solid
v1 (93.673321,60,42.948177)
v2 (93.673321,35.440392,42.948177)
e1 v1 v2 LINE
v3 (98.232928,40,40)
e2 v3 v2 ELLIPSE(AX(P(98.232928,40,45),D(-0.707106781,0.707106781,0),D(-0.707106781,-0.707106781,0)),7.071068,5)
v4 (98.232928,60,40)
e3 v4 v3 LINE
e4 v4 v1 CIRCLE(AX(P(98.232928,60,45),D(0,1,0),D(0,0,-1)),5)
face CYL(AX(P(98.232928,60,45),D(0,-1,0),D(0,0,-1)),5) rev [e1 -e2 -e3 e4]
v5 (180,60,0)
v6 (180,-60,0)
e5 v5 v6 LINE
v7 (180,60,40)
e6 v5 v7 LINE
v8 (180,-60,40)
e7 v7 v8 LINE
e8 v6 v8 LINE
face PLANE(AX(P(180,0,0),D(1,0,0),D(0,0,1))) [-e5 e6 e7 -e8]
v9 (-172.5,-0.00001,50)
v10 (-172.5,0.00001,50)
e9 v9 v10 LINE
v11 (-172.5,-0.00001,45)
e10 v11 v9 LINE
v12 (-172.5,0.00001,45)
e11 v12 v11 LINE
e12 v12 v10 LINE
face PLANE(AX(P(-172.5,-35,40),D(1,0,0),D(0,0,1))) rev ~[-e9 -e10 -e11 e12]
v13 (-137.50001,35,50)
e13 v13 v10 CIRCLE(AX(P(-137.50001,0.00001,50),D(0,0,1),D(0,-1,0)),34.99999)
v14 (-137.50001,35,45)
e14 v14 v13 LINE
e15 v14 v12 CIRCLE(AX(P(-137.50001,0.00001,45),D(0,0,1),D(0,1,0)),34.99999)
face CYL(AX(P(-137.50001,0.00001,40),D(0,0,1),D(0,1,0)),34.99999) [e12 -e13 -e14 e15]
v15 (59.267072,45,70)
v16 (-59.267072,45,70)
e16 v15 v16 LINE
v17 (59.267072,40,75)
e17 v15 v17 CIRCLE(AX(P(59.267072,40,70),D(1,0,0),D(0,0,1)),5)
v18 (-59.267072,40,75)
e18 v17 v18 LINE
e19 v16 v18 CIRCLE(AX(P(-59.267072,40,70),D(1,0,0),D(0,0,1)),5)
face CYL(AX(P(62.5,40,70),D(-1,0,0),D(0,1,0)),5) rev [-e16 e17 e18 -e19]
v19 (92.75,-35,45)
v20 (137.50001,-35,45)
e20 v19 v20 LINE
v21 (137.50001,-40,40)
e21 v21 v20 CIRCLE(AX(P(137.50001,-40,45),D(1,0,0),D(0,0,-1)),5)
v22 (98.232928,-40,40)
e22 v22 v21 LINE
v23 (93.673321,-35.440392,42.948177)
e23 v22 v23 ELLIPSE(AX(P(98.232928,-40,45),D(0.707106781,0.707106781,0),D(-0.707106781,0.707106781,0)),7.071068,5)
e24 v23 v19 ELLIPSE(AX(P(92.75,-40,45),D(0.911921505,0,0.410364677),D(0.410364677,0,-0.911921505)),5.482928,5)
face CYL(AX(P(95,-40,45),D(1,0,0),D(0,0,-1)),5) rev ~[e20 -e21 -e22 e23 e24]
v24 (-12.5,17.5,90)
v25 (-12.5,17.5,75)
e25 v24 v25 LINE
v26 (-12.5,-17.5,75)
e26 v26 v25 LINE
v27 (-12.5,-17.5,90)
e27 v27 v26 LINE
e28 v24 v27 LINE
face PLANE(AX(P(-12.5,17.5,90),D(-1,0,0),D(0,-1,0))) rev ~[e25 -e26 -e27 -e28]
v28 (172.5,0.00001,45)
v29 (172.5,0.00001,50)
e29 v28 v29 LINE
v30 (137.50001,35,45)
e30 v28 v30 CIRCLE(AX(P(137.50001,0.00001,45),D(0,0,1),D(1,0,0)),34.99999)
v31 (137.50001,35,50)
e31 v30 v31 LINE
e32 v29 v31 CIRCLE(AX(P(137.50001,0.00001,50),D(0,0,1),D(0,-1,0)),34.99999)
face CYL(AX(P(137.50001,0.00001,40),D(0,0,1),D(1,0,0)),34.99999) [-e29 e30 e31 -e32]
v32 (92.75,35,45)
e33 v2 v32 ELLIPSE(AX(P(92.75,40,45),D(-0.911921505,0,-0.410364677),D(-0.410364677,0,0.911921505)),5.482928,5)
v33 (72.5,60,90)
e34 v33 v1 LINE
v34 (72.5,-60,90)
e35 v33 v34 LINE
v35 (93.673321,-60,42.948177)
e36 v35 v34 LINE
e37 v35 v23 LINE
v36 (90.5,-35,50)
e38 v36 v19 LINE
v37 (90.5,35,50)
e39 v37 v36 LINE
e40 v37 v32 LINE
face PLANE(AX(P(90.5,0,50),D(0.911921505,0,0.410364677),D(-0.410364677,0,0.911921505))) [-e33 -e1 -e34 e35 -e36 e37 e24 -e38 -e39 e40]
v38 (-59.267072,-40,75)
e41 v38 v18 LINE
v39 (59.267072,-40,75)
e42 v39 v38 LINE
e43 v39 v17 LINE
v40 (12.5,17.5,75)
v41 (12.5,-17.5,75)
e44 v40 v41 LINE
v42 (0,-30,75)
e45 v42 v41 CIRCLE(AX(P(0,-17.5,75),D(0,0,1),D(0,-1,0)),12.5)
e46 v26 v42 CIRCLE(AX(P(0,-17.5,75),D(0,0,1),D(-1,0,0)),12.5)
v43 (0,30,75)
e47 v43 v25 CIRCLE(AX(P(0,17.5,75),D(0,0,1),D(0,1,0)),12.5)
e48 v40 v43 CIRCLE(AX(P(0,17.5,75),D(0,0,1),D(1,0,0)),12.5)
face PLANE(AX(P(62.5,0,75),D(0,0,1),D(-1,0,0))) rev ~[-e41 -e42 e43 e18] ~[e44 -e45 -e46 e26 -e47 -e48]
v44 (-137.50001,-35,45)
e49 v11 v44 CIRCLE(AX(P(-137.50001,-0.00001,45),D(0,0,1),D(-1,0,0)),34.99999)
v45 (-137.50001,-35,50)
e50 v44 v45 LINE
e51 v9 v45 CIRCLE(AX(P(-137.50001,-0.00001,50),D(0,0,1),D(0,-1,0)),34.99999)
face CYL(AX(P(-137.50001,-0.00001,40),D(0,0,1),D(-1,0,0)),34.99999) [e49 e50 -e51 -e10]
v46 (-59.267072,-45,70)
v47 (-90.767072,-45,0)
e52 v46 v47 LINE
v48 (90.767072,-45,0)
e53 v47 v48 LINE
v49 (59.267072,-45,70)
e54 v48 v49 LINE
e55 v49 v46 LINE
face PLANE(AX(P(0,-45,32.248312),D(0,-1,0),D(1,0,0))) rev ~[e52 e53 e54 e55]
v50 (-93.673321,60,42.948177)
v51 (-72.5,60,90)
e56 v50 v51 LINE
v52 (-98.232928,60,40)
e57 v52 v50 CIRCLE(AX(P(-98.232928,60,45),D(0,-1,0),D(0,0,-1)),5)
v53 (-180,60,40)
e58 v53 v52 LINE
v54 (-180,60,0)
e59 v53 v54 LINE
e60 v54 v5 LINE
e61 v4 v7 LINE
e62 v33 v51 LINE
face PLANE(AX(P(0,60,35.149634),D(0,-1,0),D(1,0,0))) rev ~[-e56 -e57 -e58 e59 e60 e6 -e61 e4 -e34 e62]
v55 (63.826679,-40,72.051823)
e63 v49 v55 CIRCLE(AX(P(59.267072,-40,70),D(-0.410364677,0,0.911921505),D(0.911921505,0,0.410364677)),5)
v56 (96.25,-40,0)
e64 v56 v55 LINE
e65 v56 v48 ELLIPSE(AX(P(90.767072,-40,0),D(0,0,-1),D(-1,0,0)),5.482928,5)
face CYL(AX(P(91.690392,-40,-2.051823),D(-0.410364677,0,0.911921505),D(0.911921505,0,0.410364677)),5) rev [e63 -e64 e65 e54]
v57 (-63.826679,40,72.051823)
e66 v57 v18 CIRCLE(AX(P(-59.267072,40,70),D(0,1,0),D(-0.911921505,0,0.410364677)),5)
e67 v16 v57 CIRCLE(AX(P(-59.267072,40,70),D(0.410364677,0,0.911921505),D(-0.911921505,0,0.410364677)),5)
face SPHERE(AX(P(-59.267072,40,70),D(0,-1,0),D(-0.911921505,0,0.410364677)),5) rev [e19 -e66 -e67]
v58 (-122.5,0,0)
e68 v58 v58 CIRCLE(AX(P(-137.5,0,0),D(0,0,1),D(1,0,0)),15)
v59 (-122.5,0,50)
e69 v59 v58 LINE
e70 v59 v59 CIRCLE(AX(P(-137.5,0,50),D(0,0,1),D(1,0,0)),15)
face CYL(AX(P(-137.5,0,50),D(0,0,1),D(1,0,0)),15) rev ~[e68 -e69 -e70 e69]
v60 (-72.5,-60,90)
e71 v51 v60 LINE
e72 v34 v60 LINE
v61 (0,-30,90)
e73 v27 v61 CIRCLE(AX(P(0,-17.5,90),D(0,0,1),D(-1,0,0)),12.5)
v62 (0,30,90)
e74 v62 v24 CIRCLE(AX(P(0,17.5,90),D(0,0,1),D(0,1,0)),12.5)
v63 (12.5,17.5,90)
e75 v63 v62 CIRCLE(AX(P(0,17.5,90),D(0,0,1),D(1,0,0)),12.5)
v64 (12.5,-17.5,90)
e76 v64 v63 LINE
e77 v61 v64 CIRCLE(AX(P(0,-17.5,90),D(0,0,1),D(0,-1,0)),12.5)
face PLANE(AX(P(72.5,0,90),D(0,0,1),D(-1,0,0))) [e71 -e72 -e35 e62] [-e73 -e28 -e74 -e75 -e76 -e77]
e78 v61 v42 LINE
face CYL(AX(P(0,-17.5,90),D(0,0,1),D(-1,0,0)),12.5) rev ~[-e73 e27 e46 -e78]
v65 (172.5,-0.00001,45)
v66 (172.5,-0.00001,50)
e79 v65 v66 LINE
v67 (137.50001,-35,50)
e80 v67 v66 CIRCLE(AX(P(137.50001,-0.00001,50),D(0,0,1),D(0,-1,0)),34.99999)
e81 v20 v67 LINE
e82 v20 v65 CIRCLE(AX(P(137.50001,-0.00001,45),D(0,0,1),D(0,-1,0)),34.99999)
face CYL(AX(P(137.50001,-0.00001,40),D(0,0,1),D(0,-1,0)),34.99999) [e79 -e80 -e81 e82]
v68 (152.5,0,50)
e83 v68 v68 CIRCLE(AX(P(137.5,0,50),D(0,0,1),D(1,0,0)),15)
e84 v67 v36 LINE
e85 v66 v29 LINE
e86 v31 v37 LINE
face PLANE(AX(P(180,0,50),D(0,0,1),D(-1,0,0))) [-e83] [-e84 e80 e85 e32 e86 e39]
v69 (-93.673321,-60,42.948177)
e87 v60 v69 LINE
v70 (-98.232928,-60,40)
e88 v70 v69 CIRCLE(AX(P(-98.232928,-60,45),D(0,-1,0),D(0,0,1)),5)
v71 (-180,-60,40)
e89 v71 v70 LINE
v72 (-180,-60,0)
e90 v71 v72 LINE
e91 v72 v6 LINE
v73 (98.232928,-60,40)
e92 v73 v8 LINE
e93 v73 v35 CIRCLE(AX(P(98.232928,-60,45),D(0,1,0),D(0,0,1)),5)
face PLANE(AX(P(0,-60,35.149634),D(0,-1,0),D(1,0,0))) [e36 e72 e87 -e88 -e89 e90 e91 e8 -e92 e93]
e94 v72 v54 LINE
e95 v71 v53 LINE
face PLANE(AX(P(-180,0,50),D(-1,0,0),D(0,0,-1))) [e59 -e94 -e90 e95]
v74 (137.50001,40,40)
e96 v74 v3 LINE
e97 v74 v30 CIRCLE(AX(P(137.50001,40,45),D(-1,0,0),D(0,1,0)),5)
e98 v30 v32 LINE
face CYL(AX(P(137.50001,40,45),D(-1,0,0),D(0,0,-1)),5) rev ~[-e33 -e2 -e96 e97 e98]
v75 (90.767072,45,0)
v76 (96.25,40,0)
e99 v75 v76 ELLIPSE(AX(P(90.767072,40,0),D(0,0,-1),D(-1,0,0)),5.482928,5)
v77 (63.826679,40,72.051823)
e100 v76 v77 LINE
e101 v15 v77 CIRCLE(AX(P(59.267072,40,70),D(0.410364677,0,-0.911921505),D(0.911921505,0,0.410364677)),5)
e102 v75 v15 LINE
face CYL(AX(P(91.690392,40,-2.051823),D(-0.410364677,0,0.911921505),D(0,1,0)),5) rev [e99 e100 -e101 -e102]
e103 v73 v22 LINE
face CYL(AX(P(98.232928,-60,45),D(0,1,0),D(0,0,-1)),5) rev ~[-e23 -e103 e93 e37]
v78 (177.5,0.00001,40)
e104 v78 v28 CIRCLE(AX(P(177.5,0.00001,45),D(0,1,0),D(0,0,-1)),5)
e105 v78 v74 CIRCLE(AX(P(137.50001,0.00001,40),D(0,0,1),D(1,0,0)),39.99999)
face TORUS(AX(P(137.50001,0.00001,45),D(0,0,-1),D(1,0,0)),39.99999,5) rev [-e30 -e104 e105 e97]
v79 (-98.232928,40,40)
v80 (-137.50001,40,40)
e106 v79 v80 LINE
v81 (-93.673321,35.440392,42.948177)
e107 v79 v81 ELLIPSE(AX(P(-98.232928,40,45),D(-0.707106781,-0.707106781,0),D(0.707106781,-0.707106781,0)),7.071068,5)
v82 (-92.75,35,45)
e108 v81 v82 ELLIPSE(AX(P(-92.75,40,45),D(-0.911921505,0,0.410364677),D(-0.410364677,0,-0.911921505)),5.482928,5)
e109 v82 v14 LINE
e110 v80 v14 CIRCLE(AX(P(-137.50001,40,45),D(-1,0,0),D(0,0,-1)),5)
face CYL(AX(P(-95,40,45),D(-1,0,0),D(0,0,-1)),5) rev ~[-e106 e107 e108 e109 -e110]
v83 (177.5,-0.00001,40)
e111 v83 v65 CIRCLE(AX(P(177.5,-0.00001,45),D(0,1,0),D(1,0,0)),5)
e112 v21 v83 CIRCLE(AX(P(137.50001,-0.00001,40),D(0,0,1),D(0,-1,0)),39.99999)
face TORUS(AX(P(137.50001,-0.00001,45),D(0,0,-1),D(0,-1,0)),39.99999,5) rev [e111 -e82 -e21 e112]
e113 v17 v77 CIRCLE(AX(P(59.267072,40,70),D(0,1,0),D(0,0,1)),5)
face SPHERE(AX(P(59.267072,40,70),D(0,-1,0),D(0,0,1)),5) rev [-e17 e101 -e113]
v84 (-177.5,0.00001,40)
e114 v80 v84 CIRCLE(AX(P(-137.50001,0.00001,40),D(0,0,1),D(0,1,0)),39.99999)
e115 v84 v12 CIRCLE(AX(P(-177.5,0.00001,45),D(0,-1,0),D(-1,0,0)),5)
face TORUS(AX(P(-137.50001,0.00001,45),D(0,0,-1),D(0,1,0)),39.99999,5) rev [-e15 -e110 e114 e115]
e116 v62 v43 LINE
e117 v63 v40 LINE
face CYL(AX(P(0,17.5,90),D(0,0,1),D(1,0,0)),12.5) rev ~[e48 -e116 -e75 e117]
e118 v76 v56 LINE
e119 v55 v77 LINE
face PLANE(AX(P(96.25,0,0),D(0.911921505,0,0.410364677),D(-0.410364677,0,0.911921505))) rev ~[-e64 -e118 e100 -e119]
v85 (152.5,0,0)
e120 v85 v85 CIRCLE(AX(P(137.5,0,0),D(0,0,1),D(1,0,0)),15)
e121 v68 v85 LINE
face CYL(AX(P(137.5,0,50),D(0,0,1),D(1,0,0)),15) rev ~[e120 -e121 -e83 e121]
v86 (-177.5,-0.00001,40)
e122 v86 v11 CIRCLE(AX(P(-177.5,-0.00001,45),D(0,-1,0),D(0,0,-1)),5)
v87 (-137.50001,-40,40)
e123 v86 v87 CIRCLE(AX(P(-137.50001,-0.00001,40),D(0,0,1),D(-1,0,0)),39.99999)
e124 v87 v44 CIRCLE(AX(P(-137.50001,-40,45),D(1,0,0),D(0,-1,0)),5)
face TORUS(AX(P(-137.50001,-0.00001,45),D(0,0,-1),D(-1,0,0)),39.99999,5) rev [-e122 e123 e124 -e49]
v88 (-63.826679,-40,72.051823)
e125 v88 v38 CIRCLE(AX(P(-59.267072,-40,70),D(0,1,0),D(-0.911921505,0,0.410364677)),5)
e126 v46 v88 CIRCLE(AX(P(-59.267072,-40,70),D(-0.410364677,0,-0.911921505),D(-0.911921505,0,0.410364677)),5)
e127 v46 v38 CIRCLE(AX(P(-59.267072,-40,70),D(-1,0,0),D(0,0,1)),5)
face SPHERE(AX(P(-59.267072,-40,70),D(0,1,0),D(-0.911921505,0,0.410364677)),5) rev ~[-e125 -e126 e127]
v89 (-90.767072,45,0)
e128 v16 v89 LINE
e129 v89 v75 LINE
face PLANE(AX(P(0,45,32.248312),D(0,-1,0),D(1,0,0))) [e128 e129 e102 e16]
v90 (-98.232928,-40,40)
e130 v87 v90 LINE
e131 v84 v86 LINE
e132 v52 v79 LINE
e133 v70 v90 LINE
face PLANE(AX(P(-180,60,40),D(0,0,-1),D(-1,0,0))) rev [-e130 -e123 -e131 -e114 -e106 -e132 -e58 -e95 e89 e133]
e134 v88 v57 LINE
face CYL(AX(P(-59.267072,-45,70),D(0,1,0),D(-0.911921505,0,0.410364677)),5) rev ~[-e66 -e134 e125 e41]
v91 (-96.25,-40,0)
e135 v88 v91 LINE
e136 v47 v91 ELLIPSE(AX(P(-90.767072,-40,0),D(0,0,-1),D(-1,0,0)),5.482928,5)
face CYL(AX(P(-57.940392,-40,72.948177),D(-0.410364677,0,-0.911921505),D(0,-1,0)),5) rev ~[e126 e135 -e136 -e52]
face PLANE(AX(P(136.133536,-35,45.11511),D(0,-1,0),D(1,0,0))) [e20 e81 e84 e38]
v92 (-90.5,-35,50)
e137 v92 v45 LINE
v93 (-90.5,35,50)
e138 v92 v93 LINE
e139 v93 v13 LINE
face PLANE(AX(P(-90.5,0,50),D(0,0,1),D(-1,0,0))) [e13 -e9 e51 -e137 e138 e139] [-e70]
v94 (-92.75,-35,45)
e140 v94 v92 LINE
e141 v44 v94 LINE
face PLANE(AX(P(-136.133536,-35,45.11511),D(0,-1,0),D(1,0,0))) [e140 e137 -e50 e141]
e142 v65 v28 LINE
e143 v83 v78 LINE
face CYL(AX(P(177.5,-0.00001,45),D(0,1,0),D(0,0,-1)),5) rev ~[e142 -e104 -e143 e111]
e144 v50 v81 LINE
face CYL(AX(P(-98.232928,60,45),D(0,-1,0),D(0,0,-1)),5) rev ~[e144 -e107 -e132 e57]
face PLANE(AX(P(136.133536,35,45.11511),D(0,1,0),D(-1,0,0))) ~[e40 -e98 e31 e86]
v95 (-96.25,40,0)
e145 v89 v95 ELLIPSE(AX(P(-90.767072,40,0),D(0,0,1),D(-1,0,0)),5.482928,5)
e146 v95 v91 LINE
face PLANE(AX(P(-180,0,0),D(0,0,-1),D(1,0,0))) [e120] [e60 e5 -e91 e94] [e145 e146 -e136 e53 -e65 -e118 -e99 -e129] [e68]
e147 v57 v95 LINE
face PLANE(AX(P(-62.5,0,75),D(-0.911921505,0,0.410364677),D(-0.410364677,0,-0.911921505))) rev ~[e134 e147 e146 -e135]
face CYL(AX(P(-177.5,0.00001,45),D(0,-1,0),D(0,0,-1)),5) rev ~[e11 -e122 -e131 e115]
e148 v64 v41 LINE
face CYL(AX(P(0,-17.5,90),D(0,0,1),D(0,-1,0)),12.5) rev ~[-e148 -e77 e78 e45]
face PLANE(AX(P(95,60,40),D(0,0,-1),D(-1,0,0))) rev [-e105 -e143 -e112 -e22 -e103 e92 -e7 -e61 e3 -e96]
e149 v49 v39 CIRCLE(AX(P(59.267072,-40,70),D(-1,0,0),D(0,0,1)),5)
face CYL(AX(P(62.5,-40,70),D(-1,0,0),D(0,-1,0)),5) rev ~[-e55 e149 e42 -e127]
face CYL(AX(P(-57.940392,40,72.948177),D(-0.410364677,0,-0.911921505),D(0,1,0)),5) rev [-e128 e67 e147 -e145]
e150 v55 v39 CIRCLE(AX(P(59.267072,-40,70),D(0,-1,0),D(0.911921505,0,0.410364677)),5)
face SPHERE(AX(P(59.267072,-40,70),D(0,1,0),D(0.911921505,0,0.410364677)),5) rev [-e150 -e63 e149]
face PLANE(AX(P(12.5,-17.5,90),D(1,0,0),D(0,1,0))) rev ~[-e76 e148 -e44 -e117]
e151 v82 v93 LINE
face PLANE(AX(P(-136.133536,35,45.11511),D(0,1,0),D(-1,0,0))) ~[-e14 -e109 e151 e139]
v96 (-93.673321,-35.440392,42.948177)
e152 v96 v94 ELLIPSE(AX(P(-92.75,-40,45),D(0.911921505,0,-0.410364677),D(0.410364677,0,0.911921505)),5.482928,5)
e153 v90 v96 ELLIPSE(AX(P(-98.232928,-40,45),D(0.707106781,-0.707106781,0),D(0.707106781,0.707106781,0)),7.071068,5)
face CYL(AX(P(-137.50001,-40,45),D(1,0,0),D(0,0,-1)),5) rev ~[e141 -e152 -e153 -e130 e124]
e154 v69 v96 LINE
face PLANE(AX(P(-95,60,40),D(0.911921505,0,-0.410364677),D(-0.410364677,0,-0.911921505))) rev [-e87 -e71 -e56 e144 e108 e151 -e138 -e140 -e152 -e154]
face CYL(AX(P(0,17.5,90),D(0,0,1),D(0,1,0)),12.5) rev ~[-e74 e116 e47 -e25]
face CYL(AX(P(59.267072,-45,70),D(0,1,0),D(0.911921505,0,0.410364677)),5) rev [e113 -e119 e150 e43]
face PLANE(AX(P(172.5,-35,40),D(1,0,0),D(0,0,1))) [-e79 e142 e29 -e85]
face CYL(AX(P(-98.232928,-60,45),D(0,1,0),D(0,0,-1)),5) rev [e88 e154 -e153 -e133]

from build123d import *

# Parameters (mm, degrees)
F1_DEPTH  = 60
F3_DEPTH  = 25
F4_W      = 7.5
F4_H      = 10
F5_DEPTH  = 70
F6_R      = 34.99999
F7_R      = 5
F8_R      = 15
F9_DEPTH  = 50
F11_DEPTH = 90
F13_DEPTH = 45
F14_R     = 5


# Not quite as in the source:
# - a fillet or chamfer is up to 0.001 mm smaller than in the source, because OpenCascade refuses the exact size
# - a pattern or mirror of a feature is missing from the dataset's text; its kind, count and spacing are read off the source's solid


with BuildPart() as f1:
    # F0 (on Front) → F1 (new body, symmetric)
    with BuildSketch(Plane.XZ):
        Polygon((-180, 0), (0, 0), (180, 0), (180, 50), (90.5, 50), (72.5, 90), (0, 90), (-72.5, 90), (-90.5, 50), (-180, 50), align=None)
    extrude(amount=F1_DEPTH, both=True)

    # F2 (on face) → F3 (cut)
    with BuildSketch(Plane.XZ.offset(60)):
        Polygon((-95, 40), (-90.5, 50), (-180, 50), (-180, 40), align=None)
        Polygon((180, 50), (90.5, 50), (95, 40), (180, 40), align=None)
    f3 = extrude(amount=-F3_DEPTH, mode=Mode.SUBTRACT)

    # F3_copies: F3 across plane
    add(f3.mirror(Plane.ZX), mode=Mode.SUBTRACT)

    # F4 (on face) → F5 (cut)
    with BuildSketch(Plane.XZ.offset(35)):
        with Locations((-176.25, 45)):
            Rectangle(F4_W, F4_H)
        with Locations((176.25, 45)):
            Rectangle(F4_W, F4_H)
    extrude(amount=-F5_DEPTH, mode=Mode.SUBTRACT)

    # F6 (radius 35 in the source; OpenCascade refuses exactly that, so slightly less here)
    f6_edges = [f1.edges().sort_by_distance(p)[0] for p in [
        (172.5, -35, 45),
        (172.5, 35, 45),
        (-172.5, -35, 45),
        (-172.5, 35, 45),
    ]]
    fillet(f6_edges, radius=F6_R)

    # F7
    f7_edges = [f1.edges().sort_by_distance(p)[0] for p in [
        (116.250005, -35, 40),
        (95, -47.5, 40),
        (-116.250005, -35, 40),
        (-95, -47.5, 40),
        (-162.24874, -24.74874, 40),
        (-172.5, 0, 40),
        (-162.24874, 24.74874, 40),
        (-116.250005, 35, 40),
        (-95, 47.5, 40),
        (116.250005, 35, 40),
        (162.24874, 24.74874, 40),
        (95, 47.5, 40),
        (172.5, 0, 40),
        (162.24874, -24.74874, 40),
    ]]
    fillet(f7_edges, radius=F7_R)

    # F8 (on face) → F9 (cut)
    with BuildSketch(Plane.XY.offset(50)):
        with Locations((-137.5, 0)):
            Circle(F8_R)
        with Locations((137.5, 0)):
            Circle(F8_R)
    extrude(amount=-F9_DEPTH, mode=Mode.SUBTRACT)

    # F10 (on face) → F11 (cut)
    with BuildSketch(Plane.XY.offset(90)):
        with BuildLine():
            ThreePointArc((0, 30), (-8.8388347648, 26.3388347648), (-12.5, 17.5))
            Line((-12.5, 17.5), (-12.5, -17.5))
            ThreePointArc((-12.5, -17.5), (-8.8388347648, -26.3388347648), (0, -30))
            ThreePointArc((0, -30), (8.8388347648, -26.3388347648), (12.5, -17.5))
            Line((12.5, -17.5), (12.5, 17.5))
            ThreePointArc((12.5, 17.5), (8.8388347648, 26.3388347648), (0, 30))
        make_face()
    extrude(amount=-F11_DEPTH, mode=Mode.SUBTRACT)

    # F12 (on Front) → F13 (cut, symmetric)
    with BuildSketch(Plane.XZ):
        Polygon((-62.5, 75), (-96.25, 0), (0, 0), (96.25, 0), (62.5, 75), (0, 75), align=None)
    extrude(amount=F13_DEPTH, both=True, mode=Mode.SUBTRACT)

    # F14
    f14_edges = [f1.edges().sort_by_distance(p)[0] for p in [
        (79.375, -45, 37.5),
        (0, -45, 75),
        (62.5, 0, 75),
        (-62.5, 0, 75),
        (-79.375, -45, 37.5),
        (-79.375, 45, 37.5),
        (0, 45, 75),
        (79.375, 45, 37.5),
    ]]
    fillet(f14_edges, radius=F14_R)


solid = f1.part
